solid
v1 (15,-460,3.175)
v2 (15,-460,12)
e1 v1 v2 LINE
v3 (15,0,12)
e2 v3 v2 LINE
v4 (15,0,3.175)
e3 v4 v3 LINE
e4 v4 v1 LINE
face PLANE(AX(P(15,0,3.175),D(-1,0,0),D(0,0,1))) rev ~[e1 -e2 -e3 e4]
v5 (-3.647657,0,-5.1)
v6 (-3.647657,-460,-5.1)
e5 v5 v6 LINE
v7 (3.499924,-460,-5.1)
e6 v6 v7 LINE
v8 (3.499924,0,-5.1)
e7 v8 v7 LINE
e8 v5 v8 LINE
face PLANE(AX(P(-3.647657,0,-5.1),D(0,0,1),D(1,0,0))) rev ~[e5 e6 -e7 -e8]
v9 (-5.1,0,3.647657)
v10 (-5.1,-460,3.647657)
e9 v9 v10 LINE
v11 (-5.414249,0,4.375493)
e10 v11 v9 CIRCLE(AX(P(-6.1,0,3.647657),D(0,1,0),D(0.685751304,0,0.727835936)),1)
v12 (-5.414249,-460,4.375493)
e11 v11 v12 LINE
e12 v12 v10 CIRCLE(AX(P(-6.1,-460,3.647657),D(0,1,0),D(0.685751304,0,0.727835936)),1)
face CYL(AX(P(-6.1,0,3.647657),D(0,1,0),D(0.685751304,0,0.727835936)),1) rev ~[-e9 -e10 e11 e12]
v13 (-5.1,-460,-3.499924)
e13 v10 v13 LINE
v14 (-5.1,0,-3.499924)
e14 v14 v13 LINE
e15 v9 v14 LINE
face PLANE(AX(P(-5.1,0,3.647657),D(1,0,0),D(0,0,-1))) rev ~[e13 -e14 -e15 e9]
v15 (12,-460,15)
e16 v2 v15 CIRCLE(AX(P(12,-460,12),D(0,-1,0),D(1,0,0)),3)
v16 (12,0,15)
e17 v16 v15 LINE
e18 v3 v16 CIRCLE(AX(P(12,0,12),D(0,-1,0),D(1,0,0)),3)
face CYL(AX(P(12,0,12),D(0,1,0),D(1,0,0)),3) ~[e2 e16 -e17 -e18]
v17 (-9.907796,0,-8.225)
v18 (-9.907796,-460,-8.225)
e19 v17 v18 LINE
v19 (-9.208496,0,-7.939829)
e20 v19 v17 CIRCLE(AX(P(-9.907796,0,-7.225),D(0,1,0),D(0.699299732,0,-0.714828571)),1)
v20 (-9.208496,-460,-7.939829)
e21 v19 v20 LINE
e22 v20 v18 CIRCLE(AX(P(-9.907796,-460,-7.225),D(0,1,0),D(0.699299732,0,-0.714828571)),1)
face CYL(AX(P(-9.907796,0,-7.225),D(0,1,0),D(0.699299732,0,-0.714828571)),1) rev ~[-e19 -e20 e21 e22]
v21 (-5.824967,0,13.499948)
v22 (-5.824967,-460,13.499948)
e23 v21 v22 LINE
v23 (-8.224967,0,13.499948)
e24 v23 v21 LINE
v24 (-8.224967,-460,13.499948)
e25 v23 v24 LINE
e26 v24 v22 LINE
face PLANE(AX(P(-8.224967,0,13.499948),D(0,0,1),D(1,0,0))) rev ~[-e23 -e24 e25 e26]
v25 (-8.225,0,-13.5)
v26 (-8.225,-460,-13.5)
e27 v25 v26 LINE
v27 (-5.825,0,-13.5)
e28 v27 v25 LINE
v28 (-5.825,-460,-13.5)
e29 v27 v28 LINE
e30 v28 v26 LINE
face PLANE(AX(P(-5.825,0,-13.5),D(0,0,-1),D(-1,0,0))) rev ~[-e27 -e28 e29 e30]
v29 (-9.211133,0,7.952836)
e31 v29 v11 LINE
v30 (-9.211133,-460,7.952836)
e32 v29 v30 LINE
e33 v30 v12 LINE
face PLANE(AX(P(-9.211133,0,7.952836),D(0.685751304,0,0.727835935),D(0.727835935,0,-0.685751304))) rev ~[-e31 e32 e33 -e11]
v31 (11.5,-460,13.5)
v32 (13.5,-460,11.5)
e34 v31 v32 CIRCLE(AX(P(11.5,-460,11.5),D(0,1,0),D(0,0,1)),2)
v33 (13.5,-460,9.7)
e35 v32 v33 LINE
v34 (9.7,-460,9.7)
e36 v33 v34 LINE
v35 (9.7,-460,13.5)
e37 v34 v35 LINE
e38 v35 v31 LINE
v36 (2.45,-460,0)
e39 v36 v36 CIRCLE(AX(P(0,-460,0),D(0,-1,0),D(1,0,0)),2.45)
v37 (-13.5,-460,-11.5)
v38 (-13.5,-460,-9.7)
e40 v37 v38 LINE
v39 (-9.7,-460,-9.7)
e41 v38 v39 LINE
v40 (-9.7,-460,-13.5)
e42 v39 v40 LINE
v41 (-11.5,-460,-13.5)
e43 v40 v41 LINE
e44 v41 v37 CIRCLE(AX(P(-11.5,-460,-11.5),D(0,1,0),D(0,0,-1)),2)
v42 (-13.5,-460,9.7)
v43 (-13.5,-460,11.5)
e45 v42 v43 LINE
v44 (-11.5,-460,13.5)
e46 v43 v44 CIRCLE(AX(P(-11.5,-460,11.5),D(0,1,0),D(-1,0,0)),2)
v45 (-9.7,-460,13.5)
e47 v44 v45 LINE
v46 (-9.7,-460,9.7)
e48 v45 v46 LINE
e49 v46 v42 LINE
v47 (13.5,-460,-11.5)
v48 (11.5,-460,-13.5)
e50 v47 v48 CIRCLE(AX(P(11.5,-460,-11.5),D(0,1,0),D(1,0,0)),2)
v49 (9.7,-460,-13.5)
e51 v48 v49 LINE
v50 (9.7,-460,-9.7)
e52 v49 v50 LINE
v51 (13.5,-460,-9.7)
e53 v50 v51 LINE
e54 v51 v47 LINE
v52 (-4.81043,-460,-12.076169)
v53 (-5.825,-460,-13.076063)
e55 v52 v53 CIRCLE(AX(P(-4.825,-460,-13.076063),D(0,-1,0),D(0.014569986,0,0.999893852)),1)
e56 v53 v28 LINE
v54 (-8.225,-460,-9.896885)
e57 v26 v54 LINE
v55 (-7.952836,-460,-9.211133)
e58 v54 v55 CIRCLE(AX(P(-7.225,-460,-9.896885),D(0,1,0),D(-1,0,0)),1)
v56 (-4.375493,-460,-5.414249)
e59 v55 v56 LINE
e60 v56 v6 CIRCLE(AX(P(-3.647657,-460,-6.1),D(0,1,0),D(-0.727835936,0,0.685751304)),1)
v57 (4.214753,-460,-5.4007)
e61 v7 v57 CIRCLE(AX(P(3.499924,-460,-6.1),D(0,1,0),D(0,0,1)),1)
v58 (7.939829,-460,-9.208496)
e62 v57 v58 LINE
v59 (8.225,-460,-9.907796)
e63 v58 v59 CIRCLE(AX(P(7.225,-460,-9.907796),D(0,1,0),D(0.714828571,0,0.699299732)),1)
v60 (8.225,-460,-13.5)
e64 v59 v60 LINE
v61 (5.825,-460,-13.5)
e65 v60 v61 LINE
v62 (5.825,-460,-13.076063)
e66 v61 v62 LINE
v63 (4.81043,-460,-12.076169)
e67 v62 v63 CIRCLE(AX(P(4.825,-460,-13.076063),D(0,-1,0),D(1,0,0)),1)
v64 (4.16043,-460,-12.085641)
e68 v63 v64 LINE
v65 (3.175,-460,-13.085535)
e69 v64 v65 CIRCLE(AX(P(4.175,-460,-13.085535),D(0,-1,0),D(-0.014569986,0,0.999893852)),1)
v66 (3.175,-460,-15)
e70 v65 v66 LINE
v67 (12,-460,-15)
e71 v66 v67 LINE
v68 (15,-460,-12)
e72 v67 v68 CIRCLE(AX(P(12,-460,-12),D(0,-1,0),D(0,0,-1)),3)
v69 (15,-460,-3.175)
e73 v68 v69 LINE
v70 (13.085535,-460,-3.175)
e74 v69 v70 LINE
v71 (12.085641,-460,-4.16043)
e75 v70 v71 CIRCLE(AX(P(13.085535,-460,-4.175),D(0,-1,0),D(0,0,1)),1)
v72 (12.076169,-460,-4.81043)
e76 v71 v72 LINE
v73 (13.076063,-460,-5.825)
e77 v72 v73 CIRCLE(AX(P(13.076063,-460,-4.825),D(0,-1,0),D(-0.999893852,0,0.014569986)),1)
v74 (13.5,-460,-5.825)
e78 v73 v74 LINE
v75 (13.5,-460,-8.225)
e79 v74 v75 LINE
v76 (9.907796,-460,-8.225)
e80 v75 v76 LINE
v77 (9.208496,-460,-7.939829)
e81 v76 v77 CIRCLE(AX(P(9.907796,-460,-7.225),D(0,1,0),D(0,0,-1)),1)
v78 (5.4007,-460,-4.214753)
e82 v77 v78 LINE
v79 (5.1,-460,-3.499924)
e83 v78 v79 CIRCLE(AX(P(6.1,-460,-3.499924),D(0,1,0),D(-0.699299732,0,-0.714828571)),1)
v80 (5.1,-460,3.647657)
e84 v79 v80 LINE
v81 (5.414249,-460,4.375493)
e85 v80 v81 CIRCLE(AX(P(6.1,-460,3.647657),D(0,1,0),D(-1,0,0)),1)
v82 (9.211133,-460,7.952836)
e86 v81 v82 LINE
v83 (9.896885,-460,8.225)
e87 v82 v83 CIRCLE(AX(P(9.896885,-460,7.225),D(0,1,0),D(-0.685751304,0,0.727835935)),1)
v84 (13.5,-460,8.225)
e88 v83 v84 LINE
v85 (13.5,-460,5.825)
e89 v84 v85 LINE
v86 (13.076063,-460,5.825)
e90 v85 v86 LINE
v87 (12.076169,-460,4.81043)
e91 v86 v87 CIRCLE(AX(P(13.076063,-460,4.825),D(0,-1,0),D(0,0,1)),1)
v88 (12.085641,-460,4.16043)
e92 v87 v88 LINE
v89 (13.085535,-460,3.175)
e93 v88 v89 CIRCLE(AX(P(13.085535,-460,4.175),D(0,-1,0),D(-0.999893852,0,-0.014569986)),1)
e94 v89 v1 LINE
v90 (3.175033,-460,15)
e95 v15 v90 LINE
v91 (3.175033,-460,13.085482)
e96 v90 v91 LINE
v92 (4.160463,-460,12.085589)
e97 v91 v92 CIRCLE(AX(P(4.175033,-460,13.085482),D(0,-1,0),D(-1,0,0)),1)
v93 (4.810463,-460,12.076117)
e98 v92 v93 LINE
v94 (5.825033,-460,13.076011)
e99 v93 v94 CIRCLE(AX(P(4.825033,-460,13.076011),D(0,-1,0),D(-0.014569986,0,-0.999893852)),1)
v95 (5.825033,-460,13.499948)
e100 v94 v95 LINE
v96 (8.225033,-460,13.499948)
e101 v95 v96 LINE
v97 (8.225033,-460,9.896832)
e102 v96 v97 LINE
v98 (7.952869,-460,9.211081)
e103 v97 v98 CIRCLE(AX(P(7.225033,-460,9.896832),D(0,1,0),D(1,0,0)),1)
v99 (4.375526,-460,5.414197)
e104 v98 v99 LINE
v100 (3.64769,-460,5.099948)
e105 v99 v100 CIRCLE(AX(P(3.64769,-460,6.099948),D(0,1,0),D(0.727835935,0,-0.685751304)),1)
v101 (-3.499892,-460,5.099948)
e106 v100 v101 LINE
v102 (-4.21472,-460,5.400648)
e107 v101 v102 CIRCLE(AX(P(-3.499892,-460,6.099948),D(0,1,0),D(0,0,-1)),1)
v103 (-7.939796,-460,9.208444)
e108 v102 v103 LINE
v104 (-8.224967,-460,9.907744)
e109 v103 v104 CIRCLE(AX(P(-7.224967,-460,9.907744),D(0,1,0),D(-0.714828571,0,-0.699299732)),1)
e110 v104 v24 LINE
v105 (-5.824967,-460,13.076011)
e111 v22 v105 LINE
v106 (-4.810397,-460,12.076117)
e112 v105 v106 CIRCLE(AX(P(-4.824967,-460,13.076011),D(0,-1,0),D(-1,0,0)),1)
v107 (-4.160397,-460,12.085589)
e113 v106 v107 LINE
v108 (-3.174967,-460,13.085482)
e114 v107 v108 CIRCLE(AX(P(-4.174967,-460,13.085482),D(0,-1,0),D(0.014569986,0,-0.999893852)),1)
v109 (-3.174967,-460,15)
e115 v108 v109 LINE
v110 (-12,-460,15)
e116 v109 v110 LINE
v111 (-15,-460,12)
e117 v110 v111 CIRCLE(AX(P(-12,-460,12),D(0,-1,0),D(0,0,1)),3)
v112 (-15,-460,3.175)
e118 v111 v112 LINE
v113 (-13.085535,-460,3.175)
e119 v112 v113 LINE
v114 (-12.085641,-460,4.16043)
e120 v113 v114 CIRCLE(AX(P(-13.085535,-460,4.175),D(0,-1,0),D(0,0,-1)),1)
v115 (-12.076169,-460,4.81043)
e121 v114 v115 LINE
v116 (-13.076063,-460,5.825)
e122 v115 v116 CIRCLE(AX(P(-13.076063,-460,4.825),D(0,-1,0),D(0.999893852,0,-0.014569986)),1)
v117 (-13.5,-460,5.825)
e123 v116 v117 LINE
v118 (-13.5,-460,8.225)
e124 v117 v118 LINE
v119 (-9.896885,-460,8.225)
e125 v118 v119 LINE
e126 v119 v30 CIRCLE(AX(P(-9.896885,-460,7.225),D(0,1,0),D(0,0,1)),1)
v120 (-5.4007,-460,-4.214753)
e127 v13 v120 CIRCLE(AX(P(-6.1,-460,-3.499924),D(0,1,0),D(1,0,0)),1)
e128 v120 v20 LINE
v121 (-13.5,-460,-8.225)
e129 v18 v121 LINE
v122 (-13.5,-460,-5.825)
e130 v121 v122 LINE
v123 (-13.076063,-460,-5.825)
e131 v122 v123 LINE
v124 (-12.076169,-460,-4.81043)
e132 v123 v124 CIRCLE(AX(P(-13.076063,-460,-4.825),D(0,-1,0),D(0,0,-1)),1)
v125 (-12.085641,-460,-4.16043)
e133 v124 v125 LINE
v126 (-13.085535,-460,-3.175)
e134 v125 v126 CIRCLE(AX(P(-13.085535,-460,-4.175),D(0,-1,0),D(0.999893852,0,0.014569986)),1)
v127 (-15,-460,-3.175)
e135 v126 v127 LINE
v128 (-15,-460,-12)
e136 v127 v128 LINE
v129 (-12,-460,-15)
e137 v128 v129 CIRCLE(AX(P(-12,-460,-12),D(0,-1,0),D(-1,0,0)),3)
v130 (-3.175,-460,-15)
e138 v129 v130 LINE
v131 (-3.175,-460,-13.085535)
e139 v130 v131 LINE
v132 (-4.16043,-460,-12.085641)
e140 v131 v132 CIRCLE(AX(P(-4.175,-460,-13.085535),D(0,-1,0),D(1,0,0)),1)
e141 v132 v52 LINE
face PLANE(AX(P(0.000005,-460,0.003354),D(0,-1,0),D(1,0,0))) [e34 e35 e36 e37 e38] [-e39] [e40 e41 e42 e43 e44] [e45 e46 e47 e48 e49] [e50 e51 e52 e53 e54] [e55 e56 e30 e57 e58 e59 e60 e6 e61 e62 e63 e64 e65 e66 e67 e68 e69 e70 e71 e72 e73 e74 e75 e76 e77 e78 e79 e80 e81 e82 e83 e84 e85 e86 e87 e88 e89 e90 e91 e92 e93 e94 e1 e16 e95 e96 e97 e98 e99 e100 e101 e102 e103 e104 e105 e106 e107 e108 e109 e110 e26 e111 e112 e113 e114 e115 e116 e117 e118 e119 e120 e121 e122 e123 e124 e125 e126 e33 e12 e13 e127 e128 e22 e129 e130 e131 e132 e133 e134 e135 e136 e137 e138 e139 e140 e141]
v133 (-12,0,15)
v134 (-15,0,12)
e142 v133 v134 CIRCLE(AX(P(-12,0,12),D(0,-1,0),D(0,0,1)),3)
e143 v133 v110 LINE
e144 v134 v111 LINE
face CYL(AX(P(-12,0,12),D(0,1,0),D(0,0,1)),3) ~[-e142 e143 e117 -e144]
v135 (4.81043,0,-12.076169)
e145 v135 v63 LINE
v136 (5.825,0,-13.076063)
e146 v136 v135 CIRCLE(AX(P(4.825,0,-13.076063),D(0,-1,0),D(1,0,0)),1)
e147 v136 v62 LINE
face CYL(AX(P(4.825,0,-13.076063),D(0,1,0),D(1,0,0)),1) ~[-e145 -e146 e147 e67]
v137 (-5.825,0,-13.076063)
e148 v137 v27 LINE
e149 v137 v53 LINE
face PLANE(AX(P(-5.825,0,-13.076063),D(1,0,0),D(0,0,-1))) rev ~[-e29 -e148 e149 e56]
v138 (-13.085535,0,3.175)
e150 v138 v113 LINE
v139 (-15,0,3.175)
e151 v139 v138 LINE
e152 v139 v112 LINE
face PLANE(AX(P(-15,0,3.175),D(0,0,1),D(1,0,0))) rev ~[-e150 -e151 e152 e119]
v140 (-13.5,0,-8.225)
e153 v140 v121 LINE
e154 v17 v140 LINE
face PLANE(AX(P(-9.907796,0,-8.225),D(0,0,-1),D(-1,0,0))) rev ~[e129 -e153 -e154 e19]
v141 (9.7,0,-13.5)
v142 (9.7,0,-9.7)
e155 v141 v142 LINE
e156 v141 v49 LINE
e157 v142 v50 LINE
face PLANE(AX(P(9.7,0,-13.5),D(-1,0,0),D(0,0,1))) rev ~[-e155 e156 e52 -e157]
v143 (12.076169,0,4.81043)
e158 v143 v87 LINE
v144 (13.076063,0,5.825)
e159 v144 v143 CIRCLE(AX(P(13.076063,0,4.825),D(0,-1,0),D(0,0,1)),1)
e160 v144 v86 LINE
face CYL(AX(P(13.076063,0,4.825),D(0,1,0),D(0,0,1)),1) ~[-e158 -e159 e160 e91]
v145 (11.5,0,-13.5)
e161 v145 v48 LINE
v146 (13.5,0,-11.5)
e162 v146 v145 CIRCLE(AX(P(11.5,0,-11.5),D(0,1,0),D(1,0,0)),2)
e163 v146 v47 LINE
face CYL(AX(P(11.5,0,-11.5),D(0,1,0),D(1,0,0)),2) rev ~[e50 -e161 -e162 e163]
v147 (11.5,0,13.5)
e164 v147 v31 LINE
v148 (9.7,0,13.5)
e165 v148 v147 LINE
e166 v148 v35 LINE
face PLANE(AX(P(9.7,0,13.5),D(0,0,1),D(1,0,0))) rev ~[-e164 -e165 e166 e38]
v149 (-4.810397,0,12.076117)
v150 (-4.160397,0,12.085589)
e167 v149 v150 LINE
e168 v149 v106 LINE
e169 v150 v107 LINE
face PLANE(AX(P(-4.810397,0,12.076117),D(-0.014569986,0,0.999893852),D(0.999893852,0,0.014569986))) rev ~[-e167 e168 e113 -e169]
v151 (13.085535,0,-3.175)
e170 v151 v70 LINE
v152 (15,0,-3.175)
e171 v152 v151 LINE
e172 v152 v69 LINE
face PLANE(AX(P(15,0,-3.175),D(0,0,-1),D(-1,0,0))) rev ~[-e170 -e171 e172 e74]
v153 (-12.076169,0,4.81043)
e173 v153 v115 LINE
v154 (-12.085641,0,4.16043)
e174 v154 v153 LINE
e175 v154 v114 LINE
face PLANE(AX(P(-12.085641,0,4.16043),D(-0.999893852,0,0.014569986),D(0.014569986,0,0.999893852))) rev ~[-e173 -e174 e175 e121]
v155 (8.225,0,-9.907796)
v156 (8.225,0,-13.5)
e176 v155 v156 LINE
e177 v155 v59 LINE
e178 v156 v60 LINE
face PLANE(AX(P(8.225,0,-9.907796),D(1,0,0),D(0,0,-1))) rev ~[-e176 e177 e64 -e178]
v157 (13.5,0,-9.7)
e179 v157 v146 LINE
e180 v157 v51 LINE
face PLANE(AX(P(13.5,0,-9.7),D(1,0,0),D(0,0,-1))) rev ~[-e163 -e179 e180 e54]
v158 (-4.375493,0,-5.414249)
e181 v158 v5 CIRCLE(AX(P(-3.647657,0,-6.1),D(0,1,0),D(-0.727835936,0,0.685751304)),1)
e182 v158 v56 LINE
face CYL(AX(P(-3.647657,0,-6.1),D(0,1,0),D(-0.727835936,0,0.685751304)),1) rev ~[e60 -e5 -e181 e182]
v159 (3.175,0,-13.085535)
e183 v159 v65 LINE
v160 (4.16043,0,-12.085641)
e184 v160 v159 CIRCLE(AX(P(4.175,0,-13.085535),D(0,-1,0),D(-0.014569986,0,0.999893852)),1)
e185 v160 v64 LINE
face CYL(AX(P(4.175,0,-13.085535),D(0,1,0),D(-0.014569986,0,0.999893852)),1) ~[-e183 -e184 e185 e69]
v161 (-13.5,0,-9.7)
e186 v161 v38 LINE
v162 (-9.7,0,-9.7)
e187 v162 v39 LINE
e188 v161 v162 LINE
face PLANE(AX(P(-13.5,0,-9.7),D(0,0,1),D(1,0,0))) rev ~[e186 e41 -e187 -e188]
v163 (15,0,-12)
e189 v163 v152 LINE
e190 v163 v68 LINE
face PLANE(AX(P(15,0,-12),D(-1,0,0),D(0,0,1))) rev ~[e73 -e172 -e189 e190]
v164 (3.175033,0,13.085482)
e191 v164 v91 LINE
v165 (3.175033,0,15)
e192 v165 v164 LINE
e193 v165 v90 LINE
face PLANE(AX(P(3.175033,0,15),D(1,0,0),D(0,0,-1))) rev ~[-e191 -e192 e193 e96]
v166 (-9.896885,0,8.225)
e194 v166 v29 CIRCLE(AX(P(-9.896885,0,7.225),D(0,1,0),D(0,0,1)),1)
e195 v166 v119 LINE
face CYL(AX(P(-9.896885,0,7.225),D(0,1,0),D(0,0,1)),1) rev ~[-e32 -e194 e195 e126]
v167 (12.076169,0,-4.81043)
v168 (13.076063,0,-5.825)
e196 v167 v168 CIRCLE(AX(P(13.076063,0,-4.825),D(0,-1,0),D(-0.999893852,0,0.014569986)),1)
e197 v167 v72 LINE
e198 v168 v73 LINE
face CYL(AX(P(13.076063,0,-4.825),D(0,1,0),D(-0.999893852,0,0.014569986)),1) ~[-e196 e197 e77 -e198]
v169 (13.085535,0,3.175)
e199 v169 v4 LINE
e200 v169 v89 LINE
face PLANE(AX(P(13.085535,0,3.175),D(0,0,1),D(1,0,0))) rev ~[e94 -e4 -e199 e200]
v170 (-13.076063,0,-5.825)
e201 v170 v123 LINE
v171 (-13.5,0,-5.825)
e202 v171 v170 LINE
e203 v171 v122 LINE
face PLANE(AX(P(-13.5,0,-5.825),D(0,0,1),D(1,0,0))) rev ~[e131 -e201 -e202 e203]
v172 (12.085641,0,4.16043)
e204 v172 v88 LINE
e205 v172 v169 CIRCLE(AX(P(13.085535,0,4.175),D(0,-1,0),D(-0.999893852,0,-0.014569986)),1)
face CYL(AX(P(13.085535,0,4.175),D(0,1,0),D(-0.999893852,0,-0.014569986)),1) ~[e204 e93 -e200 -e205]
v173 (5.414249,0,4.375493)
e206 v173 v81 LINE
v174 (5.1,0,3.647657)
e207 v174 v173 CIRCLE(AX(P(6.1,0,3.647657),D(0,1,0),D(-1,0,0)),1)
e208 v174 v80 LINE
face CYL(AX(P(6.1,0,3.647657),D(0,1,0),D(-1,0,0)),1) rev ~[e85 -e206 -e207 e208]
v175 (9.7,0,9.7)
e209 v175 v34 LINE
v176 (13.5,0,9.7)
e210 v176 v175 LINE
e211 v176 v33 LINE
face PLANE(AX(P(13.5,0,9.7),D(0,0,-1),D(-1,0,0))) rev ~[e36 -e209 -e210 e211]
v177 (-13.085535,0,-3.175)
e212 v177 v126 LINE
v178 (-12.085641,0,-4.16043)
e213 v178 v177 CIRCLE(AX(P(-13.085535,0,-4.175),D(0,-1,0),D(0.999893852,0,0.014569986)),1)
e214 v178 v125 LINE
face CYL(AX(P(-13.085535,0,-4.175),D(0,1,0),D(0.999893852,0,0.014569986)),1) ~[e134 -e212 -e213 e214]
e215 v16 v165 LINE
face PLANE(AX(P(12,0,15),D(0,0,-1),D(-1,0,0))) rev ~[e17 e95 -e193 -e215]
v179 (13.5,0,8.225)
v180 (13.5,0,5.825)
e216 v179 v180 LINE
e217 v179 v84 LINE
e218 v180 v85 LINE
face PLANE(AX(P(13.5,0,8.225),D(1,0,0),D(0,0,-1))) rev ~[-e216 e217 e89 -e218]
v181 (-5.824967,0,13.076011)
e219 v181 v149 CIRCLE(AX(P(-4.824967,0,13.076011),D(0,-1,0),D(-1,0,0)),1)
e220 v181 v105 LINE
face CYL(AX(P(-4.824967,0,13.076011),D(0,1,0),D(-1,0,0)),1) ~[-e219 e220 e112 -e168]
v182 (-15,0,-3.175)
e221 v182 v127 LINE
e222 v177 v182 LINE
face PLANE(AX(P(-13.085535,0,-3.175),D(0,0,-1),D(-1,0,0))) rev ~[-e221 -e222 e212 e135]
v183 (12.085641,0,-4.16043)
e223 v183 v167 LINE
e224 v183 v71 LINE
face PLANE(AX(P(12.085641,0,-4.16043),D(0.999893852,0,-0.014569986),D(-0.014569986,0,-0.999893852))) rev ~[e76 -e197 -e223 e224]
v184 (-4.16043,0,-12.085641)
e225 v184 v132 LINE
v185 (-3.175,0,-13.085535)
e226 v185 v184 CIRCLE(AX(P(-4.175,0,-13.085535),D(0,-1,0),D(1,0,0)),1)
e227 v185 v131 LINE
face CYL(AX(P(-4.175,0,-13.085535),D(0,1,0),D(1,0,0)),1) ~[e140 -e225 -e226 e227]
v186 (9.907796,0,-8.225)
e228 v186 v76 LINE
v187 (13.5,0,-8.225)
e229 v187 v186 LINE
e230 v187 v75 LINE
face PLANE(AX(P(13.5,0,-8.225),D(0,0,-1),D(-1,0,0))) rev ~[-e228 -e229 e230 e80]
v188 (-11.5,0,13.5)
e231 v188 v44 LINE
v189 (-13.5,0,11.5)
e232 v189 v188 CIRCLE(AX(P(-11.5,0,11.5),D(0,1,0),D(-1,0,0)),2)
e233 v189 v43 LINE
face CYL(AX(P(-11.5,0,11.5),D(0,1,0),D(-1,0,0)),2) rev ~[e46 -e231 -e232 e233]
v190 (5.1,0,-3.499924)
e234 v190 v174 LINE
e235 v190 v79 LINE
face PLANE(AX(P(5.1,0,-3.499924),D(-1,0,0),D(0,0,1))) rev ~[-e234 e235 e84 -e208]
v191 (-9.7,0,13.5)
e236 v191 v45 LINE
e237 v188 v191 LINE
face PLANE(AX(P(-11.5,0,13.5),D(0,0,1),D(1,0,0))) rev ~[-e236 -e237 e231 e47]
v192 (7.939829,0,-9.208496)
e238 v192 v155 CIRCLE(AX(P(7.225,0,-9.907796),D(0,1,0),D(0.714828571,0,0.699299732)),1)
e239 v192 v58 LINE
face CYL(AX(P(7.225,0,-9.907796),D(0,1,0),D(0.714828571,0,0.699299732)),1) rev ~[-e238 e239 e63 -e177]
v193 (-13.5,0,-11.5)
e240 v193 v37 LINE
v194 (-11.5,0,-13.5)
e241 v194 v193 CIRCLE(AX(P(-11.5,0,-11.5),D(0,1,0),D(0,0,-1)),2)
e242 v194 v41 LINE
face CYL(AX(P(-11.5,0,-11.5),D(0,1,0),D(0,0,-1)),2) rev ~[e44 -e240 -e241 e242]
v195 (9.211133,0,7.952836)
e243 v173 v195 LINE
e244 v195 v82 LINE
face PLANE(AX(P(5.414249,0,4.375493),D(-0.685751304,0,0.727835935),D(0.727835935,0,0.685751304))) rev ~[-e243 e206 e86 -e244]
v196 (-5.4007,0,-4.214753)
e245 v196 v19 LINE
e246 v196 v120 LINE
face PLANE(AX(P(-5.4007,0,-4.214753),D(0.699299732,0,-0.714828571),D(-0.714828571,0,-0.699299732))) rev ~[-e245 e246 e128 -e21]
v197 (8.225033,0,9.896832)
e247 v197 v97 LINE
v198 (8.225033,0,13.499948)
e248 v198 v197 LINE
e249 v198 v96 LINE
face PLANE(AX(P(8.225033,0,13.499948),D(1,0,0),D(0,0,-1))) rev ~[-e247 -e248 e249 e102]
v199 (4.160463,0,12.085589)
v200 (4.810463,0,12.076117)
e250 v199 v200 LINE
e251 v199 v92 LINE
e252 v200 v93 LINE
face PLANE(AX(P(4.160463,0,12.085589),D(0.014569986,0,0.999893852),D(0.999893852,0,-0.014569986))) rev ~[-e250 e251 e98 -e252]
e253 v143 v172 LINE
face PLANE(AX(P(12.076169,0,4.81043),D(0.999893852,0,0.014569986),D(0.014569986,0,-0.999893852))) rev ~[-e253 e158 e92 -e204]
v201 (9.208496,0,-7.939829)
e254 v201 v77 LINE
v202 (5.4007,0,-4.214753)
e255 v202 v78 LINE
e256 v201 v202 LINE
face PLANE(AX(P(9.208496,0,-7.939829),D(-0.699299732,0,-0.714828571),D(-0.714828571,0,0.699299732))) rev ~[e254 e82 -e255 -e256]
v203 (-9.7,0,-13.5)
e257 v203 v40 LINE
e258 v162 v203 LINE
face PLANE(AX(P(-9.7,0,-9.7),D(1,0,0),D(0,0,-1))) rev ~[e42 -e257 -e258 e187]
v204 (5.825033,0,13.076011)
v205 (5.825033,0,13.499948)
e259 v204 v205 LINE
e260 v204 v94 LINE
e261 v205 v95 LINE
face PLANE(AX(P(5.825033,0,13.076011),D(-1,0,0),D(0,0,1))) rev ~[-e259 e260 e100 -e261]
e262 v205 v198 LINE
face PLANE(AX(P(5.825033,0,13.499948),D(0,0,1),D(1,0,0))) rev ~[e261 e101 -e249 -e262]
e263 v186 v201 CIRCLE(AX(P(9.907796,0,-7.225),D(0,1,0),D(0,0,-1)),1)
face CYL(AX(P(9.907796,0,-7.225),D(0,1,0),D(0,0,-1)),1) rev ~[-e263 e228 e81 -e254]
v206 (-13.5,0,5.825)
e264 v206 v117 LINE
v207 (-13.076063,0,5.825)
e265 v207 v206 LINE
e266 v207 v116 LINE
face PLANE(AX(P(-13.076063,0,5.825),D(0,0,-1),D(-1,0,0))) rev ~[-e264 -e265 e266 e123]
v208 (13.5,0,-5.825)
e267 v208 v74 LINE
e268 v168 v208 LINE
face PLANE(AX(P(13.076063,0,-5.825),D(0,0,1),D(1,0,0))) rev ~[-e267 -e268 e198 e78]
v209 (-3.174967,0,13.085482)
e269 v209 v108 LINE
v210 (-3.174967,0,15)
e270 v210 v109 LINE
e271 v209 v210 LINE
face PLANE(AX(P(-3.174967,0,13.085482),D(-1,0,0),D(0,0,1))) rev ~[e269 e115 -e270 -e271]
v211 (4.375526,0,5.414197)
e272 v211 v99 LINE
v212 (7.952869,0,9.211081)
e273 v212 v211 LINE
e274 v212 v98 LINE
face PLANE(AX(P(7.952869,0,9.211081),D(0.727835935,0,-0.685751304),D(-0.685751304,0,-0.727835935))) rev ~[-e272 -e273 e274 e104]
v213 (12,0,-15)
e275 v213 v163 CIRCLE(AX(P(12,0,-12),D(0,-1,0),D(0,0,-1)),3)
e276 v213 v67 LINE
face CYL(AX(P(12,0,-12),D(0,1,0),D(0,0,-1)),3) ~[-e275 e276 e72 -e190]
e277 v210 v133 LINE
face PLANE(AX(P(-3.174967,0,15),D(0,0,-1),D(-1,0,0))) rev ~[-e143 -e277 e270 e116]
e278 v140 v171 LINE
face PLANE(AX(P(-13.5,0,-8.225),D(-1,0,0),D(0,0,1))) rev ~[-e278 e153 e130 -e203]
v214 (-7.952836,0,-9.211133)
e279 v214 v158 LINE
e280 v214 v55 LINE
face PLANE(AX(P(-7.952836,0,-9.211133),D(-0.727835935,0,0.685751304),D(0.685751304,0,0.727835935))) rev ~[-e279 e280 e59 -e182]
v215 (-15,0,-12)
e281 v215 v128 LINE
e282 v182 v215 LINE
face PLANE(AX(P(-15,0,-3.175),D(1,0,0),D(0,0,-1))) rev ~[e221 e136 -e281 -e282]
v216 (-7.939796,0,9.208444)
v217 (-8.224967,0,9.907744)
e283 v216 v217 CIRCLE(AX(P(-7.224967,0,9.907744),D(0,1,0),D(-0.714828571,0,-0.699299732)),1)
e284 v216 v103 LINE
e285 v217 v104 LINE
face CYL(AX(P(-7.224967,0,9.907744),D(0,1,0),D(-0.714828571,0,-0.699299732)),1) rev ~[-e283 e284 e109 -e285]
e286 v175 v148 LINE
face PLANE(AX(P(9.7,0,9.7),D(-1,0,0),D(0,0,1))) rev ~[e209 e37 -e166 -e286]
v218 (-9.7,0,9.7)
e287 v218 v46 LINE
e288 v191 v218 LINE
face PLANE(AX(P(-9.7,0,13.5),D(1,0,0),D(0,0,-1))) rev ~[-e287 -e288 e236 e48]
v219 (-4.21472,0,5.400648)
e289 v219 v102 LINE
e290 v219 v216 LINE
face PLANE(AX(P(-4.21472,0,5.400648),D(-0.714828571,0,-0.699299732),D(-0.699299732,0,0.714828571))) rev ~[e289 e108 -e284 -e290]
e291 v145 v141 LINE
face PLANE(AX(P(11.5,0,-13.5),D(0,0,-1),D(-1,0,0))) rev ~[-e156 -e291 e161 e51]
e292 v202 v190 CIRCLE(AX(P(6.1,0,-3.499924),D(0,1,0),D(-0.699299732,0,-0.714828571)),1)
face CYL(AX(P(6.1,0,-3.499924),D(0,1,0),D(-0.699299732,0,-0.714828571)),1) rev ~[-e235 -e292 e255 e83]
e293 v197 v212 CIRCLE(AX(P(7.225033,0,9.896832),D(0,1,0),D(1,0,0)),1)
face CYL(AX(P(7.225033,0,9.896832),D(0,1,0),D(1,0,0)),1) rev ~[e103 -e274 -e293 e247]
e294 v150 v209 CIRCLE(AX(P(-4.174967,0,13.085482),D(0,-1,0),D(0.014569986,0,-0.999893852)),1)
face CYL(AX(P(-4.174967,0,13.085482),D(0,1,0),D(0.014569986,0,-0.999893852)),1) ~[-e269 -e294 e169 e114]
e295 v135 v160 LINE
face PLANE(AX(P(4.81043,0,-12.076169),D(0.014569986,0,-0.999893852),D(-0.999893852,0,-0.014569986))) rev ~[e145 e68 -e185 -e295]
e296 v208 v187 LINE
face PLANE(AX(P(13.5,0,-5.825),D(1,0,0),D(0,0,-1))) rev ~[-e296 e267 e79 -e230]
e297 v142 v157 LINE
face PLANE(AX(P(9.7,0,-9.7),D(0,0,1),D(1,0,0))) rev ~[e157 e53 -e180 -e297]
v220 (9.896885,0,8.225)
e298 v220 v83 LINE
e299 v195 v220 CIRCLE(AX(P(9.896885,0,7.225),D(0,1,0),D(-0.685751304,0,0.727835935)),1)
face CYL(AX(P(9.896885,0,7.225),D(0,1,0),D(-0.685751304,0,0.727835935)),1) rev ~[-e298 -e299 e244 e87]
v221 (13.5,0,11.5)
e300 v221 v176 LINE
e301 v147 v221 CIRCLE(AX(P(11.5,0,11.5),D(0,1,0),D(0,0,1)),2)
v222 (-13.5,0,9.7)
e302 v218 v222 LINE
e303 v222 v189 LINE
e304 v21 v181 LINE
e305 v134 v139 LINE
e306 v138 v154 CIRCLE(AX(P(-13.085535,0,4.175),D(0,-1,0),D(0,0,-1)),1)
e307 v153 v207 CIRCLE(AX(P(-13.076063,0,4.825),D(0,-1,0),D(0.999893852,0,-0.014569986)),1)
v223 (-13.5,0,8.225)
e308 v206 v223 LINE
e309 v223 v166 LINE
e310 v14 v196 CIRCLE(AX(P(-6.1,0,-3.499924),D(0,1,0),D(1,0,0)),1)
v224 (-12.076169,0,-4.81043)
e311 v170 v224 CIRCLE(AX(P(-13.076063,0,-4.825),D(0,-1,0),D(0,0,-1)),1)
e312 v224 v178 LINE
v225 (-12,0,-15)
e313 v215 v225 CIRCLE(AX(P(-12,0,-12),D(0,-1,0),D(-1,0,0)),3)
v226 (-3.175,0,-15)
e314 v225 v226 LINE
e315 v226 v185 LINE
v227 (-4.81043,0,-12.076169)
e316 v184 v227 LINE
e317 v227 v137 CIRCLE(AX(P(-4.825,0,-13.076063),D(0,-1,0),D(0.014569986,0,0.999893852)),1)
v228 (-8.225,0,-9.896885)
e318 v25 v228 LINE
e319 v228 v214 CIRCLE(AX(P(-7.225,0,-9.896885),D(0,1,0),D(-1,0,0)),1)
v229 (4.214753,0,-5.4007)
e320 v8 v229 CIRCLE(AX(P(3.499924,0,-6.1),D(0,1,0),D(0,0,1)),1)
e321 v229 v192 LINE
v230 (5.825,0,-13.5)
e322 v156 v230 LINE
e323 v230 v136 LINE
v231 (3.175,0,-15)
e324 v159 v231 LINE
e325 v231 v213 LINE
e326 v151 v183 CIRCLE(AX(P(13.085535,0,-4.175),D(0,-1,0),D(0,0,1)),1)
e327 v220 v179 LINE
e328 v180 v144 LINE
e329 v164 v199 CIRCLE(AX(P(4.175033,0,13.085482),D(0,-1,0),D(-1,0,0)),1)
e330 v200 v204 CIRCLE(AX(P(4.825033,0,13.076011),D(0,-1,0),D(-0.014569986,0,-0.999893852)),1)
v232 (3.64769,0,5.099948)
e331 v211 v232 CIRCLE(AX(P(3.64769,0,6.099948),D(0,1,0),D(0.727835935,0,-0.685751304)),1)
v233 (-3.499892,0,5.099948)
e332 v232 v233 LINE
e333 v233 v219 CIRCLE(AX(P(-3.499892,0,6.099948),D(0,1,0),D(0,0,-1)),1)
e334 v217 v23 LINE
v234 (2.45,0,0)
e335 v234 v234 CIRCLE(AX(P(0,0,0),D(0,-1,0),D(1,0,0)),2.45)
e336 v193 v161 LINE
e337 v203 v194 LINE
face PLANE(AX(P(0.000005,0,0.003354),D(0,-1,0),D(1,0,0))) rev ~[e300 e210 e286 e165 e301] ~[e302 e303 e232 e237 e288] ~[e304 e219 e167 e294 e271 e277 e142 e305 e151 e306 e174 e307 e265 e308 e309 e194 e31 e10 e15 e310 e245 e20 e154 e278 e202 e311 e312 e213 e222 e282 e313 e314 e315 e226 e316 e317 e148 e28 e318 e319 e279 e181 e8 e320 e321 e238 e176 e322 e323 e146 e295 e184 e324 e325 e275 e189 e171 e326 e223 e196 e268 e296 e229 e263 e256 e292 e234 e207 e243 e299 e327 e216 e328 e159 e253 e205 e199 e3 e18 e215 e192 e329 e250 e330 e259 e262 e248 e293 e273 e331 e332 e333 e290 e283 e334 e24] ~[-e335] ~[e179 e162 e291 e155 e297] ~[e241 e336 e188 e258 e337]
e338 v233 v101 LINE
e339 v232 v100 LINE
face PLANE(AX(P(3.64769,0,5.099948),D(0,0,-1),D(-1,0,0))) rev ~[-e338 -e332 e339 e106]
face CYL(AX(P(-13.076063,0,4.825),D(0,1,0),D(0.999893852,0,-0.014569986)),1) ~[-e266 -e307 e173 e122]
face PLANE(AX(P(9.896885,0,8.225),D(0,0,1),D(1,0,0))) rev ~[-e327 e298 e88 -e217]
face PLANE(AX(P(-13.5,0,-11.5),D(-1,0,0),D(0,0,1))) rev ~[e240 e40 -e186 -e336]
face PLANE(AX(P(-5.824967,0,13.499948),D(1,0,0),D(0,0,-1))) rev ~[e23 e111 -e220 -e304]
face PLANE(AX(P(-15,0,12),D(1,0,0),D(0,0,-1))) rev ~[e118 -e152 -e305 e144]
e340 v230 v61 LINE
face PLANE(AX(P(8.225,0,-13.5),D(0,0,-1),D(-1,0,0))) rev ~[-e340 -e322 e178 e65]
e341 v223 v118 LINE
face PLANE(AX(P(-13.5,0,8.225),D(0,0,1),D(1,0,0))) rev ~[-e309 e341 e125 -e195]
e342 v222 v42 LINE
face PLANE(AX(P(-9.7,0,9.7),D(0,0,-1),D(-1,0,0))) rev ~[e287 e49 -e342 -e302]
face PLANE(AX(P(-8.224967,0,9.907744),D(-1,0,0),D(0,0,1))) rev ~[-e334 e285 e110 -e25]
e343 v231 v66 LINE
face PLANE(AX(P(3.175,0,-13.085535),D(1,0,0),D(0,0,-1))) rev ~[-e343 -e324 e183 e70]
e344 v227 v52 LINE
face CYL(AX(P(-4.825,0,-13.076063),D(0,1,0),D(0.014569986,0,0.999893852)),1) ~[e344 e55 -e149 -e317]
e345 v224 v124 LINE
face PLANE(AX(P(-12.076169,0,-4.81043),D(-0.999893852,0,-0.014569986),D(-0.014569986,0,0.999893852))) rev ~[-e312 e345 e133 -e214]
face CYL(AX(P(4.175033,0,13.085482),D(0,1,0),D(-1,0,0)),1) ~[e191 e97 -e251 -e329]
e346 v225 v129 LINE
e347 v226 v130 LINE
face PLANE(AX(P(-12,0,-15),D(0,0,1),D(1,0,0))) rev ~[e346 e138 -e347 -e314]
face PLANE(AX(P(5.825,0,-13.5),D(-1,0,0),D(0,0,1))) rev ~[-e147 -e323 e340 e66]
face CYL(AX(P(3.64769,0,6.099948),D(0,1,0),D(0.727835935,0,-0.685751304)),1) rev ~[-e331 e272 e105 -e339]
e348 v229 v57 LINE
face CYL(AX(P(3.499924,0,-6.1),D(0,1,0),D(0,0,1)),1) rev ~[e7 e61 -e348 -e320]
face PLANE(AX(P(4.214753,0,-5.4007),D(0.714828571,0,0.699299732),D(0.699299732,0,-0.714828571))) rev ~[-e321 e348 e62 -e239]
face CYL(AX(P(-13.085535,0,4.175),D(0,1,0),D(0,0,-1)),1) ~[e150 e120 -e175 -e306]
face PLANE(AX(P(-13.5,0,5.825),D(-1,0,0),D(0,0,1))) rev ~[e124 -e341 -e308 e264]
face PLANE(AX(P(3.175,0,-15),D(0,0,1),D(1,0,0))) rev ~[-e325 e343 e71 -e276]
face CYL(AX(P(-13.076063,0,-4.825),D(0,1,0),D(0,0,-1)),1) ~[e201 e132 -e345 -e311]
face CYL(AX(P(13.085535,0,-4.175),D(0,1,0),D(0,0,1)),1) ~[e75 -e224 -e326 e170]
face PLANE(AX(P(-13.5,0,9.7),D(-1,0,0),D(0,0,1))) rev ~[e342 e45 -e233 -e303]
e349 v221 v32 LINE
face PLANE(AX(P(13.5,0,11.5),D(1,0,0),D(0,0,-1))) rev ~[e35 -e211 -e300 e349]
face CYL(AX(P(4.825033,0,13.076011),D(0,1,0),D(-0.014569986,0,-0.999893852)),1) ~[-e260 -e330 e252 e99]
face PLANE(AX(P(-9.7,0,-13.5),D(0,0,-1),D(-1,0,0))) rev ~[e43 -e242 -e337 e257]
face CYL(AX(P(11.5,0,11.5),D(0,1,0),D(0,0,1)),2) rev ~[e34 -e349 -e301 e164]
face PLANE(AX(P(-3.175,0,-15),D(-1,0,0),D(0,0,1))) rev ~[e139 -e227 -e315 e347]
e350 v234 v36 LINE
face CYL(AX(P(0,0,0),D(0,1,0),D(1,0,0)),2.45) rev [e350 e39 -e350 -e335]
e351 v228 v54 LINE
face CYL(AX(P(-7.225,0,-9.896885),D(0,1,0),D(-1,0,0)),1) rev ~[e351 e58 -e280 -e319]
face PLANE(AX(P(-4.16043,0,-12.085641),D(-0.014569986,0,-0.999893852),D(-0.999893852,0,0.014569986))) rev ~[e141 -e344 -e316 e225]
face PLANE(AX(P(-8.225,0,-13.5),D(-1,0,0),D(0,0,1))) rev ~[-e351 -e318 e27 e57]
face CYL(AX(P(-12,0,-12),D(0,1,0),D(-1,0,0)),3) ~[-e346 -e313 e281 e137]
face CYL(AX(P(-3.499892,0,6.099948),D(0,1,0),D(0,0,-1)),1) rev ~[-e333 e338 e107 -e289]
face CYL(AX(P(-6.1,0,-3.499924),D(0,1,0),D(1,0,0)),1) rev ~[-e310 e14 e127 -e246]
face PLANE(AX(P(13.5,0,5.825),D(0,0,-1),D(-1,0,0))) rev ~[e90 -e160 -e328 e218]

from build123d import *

# Parameters (mm, degrees)
F0_R     = 2.45
F1_DEPTH = 460


# Not quite as in the source:
# - ends of sketch curves that miss each other by under 0.0002 mm in the source are joined


with BuildPart() as f1:
    # F0 (on Front) → F1 (new body)
    with BuildSketch(Plane.XZ):
        with BuildLine():
            Line((-3.1749674082, 15), (-12, 15))
            ThreePointArc((-12, 15), (-14.1213203436, 14.1213203436), (-15, 12))
            Line((-15, 12), (-15, 3.175))
            Line((-15, 3.175), (-13.0855346263, 3.175))
            ThreePointArc((-13.0855346263, 3.175), (-12.3835980145, 3.4627605788), (-12.0856407741, 4.1604300138))
            Line((-12.0856407741, 4.1604300138), (-12.0761692778, 4.8104300138))
            ThreePointArc((-12.0761692778, 4.8104300138), (-12.3638237087, 5.5269366118), (-13.0760631299, 5.825))
            Line((-13.0760631299, 5.825), (-13.5, 5.825))
            Line((-13.5, 5.825), (-13.5, 8.225))
            Line((-13.5, 8.225), (-9.8968845016, 8.225))
            ThreePointArc((-9.8968845016, 8.225), (-9.5279915195, 8.1544718757), (-9.2111331975, 7.9528359354))
            Line((-9.2111331975, 7.9528359354), (-5.4142486959, 4.3754933338))
            ThreePointArc((-5.4142486959, 4.3754933338), (-5.1819174045, 4.0440465354), (-5.1, 3.6476573984))
            Line((-5.1, 3.6476573984), (-5.1, -3.4999243287))
            ThreePointArc((-5.1, -3.4999243287), (-5.1782354607, -3.8876744211), (-5.4007002683, -4.2147528992))
            Line((-5.4007002683, -4.2147528992), (-9.2084959767, -7.9398285705))
            ThreePointArc((-9.2084959767, -7.9398285705), (-9.5301904718, -8.1509666761), (-9.9077957084, -8.225))
            Line((-9.9077957084, -8.225), (-13.5, -8.225))
            Line((-13.5, -8.225), (-13.5, -5.825))
            Line((-13.5, -5.825), (-13.0760631299, -5.825))
            ThreePointArc((-13.0760631299, -5.825), (-12.3638237087, -5.5269366118), (-12.0761692778, -4.8104300138))
            Line((-12.0761692778, -4.8104300138), (-12.0856407741, -4.1604300138))
            ThreePointArc((-12.0856407741, -4.1604300138), (-12.3835980145, -3.4627605788), (-13.0855346263, -3.175))
            Line((-13.0855346263, -3.175), (-15, -3.175))
            Line((-15, -3.175), (-15, -12))
            ThreePointArc((-15, -12), (-14.1213203436, -14.1213203436), (-12, -15))
            Line((-12, -15), (-3.175, -15))
            Line((-3.175, -15), (-3.175, -13.0855346263))
            ThreePointArc((-3.175, -13.0855346263), (-3.4627605788, -12.3835980145), (-4.1604300138, -12.0856407741))
            Line((-4.1604300138, -12.0856407741), (-4.8104300138, -12.0761692778))
            ThreePointArc((-4.8104300138, -12.0761692778), (-5.5269366118, -12.3638237087), (-5.825, -13.0760631299))
            Line((-5.825, -13.0760631299), (-5.825, -13.5))
            Line((-5.825, -13.5), (-8.225, -13.5))
            Line((-8.225, -13.5), (-8.225, -9.8968845016))
            ThreePointArc((-8.225, -9.8968845016), (-8.1544718757, -9.5279915195), (-7.9528359354, -9.2111331975))
            Line((-7.9528359354, -9.2111331975), (-4.3754933338, -5.4142486959))
            ThreePointArc((-4.3754933338, -5.4142486959), (-4.0440465354, -5.1819174045), (-3.6476573984, -5.1))
            Line((-3.6476573984, -5.1), (3.4999243287, -5.1))
            ThreePointArc((3.4999243287, -5.1), (3.8876744211, -5.1782354607), (4.2147528992, -5.4007002683))
            Line((4.2147528992, -5.4007002683), (7.9398285705, -9.2084959767))
            ThreePointArc((7.9398285705, -9.2084959767), (8.1509666761, -9.5301904718), (8.225, -9.9077957084))
            Line((8.225, -9.9077957084), (8.225, -13.5))
            Line((8.225, -13.5), (5.825, -13.5))
            Line((5.825, -13.5), (5.825, -13.0760631299))
            ThreePointArc((5.825, -13.0760631299), (5.5269366118, -12.3638237087), (4.8104300138, -12.0761692778))
            Line((4.8104300138, -12.0761692778), (4.1604300138, -12.0856407741))
            ThreePointArc((4.1604300138, -12.0856407741), (3.4627605788, -12.3835980145), (3.175, -13.0855346263))
            Line((3.175, -13.0855346263), (3.175, -15))
            Line((3.175, -15), (12, -15))
            ThreePointArc((12, -15), (14.1213203436, -14.1213203436), (15, -12))
            Line((15, -12), (15, -3.175))
            Line((15, -3.175), (13.0855346263, -3.175))
            ThreePointArc((13.0855346263, -3.175), (12.3835980145, -3.4627605788), (12.0856407741, -4.1604300138))
            Line((12.0856407741, -4.1604300138), (12.0761692778, -4.8104300138))
            ThreePointArc((12.0761692778, -4.8104300138), (12.3638237087, -5.5269366118), (13.0760631299, -5.825))
            Line((13.0760631299, -5.825), (13.5, -5.825))
            Line((13.5, -5.825), (13.5, -8.225))
            Line((13.5, -8.225), (9.9077957084, -8.225))
            ThreePointArc((9.9077957084, -8.225), (9.5301904718, -8.1509666761), (9.2084959767, -7.9398285705))
            Line((9.2084959767, -7.9398285705), (5.4007002683, -4.2147528992))
            ThreePointArc((5.4007002683, -4.2147528992), (5.1782354607, -3.8876744211), (5.1, -3.4999243287))
            Line((5.1, -3.4999243287), (5.1, 3.6476573984))
            ThreePointArc((5.1, 3.6476573984), (5.1819174045, 4.0440465354), (5.4142486959, 4.3754933338))
            Line((5.4142486959, 4.3754933338), (9.2111331975, 7.9528359354))
            ThreePointArc((9.2111331975, 7.9528359354), (9.5279915195, 8.1544718757), (9.8968845016, 8.225))
            Line((9.8968845016, 8.225), (13.5, 8.225))
            Line((13.5, 8.225), (13.5, 5.825))
            Line((13.5, 5.825), (13.0760631299, 5.825))
            ThreePointArc((13.0760631299, 5.825), (12.3638237087, 5.5269366118), (12.0761692778, 4.8104300138))
            Line((12.0761692778, 4.8104300138), (12.0856407741, 4.1604300138))
            ThreePointArc((12.0856407741, 4.1604300138), (12.3835980145, 3.4627605788), (13.0855346263, 3.175))
            Line((13.0855346263, 3.175), (15, 3.175))
            Line((15, 3.175), (15, 12))
            ThreePointArc((15, 12), (14.1213203436, 14.1213203436), (12, 15))
            Line((12, 15), (3.1750325918, 15))
            Line((3.1750325918, 15), (3.1750325918, 13.0854824722))
            ThreePointArc((3.1750325918, 13.0854824722), (3.4627931706, 12.3835458604), (4.1604626057, 12.0855886201))
            Line((4.1604626057, 12.0855886201), (4.8104626057, 12.0761171237))
            ThreePointArc((4.8104626057, 12.0761171237), (5.5269692036, 12.3637715546), (5.8250325918, 13.0760109758))
            Line((5.8250325918, 13.0760109758), (5.8250325918, 13.4999478459))
            Line((5.8250325918, 13.4999478459), (8.2250325918, 13.4999478459))
            Line((8.2250325918, 13.4999478459), (8.2250325918, 9.8968323476))
            ThreePointArc((8.2250325918, 9.8968323476), (8.1545044675, 9.5279393654), (7.9528685272, 9.2110810434))
            Line((7.9528685272, 9.2110810434), (4.3755259256, 5.4141965418))
            ThreePointArc((4.3755259256, 5.4141965418), (4.0440791272, 5.1818652505), (3.6476899902, 5.0999478459))
            Line((3.6476899902, 5.0999478459), (-3.4998917369, 5.0999478459))
            ThreePointArc((-3.4998917369, 5.0999478459), (-3.8876418293, 5.1781833067), (-4.2147203074, 5.4006481142))
            Line((-4.2147203074, 5.4006481142), (-7.9397959787, 9.2084438226))
            ThreePointArc((-7.9397959787, 9.2084438226), (-8.1509340843, 9.5301383177), (-8.2249674082, 9.9077435543))
            Line((-8.2249674082, 9.9077435543), (-8.2249674082, 13.4999478459))
            Line((-8.2249674082, 13.4999478459), (-5.8249674082, 13.4999478459))
            Line((-5.8249674082, 13.4999478459), (-5.8249674082, 13.0760109758))
            ThreePointArc((-5.8249674082, 13.0760109758), (-5.5269040199, 12.3637715546), (-4.810397422, 12.0761171237))
            Line((-4.810397422, 12.0761171237), (-4.160397422, 12.0855886201))
            ThreePointArc((-4.160397422, 12.0855886201), (-3.462727987, 12.3835458604), (-3.1749674082, 13.0854824722))
            Line((-3.1749674082, 13.0854824722), (-3.1749674082, 15))
        make_face()
        with BuildLine():
            Line((-13.5, -11.5), (-13.5, -9.7))
            Line((-13.5, -9.7), (-9.7, -9.7))
            Line((-9.7, -9.7), (-9.7, -13.5))
            Line((-9.7, -13.5), (-11.5, -13.5))
            ThreePointArc((-11.5, -13.5), (-12.9142135624, -12.9142135624), (-13.5, -11.5))
        make_face(mode=Mode.SUBTRACT)
        with BuildLine():
            Line((9.7, -9.7), (13.5, -9.7))
            Line((13.5, -9.7), (13.5, -11.5))
            ThreePointArc((13.5, -11.5), (12.9142135624, -12.9142135624), (11.5, -13.5))
            Line((11.5, -13.5), (9.7, -13.5))
            Line((9.7, -13.5), (9.7, -9.7))
        make_face(mode=Mode.SUBTRACT)
        with BuildLine():
            ThreePointArc((-13.5, 11.5), (-12.9142135624, 12.9142135624), (-11.5, 13.5))
            Line((-11.5, 13.5), (-9.7, 13.5))
            Line((-9.7, 13.5), (-9.7, 9.7))
            Line((-9.7, 9.7), (-13.5, 9.7))
            Line((-13.5, 9.7), (-13.5, 11.5))
        make_face(mode=Mode.SUBTRACT)
        Circle(F0_R, mode=Mode.SUBTRACT)
        with BuildLine():
            Line((9.7, 13.5), (11.5, 13.5))
            ThreePointArc((11.5, 13.5), (12.9142135624, 12.9142135624), (13.5, 11.5))
            Line((13.5, 11.5), (13.5, 9.7))
            Line((13.5, 9.7), (9.7, 9.7))
            Line((9.7, 9.7), (9.7, 13.5))
        make_face(mode=Mode.SUBTRACT)
    extrude(amount=F1_DEPTH)


solid = f1.part
